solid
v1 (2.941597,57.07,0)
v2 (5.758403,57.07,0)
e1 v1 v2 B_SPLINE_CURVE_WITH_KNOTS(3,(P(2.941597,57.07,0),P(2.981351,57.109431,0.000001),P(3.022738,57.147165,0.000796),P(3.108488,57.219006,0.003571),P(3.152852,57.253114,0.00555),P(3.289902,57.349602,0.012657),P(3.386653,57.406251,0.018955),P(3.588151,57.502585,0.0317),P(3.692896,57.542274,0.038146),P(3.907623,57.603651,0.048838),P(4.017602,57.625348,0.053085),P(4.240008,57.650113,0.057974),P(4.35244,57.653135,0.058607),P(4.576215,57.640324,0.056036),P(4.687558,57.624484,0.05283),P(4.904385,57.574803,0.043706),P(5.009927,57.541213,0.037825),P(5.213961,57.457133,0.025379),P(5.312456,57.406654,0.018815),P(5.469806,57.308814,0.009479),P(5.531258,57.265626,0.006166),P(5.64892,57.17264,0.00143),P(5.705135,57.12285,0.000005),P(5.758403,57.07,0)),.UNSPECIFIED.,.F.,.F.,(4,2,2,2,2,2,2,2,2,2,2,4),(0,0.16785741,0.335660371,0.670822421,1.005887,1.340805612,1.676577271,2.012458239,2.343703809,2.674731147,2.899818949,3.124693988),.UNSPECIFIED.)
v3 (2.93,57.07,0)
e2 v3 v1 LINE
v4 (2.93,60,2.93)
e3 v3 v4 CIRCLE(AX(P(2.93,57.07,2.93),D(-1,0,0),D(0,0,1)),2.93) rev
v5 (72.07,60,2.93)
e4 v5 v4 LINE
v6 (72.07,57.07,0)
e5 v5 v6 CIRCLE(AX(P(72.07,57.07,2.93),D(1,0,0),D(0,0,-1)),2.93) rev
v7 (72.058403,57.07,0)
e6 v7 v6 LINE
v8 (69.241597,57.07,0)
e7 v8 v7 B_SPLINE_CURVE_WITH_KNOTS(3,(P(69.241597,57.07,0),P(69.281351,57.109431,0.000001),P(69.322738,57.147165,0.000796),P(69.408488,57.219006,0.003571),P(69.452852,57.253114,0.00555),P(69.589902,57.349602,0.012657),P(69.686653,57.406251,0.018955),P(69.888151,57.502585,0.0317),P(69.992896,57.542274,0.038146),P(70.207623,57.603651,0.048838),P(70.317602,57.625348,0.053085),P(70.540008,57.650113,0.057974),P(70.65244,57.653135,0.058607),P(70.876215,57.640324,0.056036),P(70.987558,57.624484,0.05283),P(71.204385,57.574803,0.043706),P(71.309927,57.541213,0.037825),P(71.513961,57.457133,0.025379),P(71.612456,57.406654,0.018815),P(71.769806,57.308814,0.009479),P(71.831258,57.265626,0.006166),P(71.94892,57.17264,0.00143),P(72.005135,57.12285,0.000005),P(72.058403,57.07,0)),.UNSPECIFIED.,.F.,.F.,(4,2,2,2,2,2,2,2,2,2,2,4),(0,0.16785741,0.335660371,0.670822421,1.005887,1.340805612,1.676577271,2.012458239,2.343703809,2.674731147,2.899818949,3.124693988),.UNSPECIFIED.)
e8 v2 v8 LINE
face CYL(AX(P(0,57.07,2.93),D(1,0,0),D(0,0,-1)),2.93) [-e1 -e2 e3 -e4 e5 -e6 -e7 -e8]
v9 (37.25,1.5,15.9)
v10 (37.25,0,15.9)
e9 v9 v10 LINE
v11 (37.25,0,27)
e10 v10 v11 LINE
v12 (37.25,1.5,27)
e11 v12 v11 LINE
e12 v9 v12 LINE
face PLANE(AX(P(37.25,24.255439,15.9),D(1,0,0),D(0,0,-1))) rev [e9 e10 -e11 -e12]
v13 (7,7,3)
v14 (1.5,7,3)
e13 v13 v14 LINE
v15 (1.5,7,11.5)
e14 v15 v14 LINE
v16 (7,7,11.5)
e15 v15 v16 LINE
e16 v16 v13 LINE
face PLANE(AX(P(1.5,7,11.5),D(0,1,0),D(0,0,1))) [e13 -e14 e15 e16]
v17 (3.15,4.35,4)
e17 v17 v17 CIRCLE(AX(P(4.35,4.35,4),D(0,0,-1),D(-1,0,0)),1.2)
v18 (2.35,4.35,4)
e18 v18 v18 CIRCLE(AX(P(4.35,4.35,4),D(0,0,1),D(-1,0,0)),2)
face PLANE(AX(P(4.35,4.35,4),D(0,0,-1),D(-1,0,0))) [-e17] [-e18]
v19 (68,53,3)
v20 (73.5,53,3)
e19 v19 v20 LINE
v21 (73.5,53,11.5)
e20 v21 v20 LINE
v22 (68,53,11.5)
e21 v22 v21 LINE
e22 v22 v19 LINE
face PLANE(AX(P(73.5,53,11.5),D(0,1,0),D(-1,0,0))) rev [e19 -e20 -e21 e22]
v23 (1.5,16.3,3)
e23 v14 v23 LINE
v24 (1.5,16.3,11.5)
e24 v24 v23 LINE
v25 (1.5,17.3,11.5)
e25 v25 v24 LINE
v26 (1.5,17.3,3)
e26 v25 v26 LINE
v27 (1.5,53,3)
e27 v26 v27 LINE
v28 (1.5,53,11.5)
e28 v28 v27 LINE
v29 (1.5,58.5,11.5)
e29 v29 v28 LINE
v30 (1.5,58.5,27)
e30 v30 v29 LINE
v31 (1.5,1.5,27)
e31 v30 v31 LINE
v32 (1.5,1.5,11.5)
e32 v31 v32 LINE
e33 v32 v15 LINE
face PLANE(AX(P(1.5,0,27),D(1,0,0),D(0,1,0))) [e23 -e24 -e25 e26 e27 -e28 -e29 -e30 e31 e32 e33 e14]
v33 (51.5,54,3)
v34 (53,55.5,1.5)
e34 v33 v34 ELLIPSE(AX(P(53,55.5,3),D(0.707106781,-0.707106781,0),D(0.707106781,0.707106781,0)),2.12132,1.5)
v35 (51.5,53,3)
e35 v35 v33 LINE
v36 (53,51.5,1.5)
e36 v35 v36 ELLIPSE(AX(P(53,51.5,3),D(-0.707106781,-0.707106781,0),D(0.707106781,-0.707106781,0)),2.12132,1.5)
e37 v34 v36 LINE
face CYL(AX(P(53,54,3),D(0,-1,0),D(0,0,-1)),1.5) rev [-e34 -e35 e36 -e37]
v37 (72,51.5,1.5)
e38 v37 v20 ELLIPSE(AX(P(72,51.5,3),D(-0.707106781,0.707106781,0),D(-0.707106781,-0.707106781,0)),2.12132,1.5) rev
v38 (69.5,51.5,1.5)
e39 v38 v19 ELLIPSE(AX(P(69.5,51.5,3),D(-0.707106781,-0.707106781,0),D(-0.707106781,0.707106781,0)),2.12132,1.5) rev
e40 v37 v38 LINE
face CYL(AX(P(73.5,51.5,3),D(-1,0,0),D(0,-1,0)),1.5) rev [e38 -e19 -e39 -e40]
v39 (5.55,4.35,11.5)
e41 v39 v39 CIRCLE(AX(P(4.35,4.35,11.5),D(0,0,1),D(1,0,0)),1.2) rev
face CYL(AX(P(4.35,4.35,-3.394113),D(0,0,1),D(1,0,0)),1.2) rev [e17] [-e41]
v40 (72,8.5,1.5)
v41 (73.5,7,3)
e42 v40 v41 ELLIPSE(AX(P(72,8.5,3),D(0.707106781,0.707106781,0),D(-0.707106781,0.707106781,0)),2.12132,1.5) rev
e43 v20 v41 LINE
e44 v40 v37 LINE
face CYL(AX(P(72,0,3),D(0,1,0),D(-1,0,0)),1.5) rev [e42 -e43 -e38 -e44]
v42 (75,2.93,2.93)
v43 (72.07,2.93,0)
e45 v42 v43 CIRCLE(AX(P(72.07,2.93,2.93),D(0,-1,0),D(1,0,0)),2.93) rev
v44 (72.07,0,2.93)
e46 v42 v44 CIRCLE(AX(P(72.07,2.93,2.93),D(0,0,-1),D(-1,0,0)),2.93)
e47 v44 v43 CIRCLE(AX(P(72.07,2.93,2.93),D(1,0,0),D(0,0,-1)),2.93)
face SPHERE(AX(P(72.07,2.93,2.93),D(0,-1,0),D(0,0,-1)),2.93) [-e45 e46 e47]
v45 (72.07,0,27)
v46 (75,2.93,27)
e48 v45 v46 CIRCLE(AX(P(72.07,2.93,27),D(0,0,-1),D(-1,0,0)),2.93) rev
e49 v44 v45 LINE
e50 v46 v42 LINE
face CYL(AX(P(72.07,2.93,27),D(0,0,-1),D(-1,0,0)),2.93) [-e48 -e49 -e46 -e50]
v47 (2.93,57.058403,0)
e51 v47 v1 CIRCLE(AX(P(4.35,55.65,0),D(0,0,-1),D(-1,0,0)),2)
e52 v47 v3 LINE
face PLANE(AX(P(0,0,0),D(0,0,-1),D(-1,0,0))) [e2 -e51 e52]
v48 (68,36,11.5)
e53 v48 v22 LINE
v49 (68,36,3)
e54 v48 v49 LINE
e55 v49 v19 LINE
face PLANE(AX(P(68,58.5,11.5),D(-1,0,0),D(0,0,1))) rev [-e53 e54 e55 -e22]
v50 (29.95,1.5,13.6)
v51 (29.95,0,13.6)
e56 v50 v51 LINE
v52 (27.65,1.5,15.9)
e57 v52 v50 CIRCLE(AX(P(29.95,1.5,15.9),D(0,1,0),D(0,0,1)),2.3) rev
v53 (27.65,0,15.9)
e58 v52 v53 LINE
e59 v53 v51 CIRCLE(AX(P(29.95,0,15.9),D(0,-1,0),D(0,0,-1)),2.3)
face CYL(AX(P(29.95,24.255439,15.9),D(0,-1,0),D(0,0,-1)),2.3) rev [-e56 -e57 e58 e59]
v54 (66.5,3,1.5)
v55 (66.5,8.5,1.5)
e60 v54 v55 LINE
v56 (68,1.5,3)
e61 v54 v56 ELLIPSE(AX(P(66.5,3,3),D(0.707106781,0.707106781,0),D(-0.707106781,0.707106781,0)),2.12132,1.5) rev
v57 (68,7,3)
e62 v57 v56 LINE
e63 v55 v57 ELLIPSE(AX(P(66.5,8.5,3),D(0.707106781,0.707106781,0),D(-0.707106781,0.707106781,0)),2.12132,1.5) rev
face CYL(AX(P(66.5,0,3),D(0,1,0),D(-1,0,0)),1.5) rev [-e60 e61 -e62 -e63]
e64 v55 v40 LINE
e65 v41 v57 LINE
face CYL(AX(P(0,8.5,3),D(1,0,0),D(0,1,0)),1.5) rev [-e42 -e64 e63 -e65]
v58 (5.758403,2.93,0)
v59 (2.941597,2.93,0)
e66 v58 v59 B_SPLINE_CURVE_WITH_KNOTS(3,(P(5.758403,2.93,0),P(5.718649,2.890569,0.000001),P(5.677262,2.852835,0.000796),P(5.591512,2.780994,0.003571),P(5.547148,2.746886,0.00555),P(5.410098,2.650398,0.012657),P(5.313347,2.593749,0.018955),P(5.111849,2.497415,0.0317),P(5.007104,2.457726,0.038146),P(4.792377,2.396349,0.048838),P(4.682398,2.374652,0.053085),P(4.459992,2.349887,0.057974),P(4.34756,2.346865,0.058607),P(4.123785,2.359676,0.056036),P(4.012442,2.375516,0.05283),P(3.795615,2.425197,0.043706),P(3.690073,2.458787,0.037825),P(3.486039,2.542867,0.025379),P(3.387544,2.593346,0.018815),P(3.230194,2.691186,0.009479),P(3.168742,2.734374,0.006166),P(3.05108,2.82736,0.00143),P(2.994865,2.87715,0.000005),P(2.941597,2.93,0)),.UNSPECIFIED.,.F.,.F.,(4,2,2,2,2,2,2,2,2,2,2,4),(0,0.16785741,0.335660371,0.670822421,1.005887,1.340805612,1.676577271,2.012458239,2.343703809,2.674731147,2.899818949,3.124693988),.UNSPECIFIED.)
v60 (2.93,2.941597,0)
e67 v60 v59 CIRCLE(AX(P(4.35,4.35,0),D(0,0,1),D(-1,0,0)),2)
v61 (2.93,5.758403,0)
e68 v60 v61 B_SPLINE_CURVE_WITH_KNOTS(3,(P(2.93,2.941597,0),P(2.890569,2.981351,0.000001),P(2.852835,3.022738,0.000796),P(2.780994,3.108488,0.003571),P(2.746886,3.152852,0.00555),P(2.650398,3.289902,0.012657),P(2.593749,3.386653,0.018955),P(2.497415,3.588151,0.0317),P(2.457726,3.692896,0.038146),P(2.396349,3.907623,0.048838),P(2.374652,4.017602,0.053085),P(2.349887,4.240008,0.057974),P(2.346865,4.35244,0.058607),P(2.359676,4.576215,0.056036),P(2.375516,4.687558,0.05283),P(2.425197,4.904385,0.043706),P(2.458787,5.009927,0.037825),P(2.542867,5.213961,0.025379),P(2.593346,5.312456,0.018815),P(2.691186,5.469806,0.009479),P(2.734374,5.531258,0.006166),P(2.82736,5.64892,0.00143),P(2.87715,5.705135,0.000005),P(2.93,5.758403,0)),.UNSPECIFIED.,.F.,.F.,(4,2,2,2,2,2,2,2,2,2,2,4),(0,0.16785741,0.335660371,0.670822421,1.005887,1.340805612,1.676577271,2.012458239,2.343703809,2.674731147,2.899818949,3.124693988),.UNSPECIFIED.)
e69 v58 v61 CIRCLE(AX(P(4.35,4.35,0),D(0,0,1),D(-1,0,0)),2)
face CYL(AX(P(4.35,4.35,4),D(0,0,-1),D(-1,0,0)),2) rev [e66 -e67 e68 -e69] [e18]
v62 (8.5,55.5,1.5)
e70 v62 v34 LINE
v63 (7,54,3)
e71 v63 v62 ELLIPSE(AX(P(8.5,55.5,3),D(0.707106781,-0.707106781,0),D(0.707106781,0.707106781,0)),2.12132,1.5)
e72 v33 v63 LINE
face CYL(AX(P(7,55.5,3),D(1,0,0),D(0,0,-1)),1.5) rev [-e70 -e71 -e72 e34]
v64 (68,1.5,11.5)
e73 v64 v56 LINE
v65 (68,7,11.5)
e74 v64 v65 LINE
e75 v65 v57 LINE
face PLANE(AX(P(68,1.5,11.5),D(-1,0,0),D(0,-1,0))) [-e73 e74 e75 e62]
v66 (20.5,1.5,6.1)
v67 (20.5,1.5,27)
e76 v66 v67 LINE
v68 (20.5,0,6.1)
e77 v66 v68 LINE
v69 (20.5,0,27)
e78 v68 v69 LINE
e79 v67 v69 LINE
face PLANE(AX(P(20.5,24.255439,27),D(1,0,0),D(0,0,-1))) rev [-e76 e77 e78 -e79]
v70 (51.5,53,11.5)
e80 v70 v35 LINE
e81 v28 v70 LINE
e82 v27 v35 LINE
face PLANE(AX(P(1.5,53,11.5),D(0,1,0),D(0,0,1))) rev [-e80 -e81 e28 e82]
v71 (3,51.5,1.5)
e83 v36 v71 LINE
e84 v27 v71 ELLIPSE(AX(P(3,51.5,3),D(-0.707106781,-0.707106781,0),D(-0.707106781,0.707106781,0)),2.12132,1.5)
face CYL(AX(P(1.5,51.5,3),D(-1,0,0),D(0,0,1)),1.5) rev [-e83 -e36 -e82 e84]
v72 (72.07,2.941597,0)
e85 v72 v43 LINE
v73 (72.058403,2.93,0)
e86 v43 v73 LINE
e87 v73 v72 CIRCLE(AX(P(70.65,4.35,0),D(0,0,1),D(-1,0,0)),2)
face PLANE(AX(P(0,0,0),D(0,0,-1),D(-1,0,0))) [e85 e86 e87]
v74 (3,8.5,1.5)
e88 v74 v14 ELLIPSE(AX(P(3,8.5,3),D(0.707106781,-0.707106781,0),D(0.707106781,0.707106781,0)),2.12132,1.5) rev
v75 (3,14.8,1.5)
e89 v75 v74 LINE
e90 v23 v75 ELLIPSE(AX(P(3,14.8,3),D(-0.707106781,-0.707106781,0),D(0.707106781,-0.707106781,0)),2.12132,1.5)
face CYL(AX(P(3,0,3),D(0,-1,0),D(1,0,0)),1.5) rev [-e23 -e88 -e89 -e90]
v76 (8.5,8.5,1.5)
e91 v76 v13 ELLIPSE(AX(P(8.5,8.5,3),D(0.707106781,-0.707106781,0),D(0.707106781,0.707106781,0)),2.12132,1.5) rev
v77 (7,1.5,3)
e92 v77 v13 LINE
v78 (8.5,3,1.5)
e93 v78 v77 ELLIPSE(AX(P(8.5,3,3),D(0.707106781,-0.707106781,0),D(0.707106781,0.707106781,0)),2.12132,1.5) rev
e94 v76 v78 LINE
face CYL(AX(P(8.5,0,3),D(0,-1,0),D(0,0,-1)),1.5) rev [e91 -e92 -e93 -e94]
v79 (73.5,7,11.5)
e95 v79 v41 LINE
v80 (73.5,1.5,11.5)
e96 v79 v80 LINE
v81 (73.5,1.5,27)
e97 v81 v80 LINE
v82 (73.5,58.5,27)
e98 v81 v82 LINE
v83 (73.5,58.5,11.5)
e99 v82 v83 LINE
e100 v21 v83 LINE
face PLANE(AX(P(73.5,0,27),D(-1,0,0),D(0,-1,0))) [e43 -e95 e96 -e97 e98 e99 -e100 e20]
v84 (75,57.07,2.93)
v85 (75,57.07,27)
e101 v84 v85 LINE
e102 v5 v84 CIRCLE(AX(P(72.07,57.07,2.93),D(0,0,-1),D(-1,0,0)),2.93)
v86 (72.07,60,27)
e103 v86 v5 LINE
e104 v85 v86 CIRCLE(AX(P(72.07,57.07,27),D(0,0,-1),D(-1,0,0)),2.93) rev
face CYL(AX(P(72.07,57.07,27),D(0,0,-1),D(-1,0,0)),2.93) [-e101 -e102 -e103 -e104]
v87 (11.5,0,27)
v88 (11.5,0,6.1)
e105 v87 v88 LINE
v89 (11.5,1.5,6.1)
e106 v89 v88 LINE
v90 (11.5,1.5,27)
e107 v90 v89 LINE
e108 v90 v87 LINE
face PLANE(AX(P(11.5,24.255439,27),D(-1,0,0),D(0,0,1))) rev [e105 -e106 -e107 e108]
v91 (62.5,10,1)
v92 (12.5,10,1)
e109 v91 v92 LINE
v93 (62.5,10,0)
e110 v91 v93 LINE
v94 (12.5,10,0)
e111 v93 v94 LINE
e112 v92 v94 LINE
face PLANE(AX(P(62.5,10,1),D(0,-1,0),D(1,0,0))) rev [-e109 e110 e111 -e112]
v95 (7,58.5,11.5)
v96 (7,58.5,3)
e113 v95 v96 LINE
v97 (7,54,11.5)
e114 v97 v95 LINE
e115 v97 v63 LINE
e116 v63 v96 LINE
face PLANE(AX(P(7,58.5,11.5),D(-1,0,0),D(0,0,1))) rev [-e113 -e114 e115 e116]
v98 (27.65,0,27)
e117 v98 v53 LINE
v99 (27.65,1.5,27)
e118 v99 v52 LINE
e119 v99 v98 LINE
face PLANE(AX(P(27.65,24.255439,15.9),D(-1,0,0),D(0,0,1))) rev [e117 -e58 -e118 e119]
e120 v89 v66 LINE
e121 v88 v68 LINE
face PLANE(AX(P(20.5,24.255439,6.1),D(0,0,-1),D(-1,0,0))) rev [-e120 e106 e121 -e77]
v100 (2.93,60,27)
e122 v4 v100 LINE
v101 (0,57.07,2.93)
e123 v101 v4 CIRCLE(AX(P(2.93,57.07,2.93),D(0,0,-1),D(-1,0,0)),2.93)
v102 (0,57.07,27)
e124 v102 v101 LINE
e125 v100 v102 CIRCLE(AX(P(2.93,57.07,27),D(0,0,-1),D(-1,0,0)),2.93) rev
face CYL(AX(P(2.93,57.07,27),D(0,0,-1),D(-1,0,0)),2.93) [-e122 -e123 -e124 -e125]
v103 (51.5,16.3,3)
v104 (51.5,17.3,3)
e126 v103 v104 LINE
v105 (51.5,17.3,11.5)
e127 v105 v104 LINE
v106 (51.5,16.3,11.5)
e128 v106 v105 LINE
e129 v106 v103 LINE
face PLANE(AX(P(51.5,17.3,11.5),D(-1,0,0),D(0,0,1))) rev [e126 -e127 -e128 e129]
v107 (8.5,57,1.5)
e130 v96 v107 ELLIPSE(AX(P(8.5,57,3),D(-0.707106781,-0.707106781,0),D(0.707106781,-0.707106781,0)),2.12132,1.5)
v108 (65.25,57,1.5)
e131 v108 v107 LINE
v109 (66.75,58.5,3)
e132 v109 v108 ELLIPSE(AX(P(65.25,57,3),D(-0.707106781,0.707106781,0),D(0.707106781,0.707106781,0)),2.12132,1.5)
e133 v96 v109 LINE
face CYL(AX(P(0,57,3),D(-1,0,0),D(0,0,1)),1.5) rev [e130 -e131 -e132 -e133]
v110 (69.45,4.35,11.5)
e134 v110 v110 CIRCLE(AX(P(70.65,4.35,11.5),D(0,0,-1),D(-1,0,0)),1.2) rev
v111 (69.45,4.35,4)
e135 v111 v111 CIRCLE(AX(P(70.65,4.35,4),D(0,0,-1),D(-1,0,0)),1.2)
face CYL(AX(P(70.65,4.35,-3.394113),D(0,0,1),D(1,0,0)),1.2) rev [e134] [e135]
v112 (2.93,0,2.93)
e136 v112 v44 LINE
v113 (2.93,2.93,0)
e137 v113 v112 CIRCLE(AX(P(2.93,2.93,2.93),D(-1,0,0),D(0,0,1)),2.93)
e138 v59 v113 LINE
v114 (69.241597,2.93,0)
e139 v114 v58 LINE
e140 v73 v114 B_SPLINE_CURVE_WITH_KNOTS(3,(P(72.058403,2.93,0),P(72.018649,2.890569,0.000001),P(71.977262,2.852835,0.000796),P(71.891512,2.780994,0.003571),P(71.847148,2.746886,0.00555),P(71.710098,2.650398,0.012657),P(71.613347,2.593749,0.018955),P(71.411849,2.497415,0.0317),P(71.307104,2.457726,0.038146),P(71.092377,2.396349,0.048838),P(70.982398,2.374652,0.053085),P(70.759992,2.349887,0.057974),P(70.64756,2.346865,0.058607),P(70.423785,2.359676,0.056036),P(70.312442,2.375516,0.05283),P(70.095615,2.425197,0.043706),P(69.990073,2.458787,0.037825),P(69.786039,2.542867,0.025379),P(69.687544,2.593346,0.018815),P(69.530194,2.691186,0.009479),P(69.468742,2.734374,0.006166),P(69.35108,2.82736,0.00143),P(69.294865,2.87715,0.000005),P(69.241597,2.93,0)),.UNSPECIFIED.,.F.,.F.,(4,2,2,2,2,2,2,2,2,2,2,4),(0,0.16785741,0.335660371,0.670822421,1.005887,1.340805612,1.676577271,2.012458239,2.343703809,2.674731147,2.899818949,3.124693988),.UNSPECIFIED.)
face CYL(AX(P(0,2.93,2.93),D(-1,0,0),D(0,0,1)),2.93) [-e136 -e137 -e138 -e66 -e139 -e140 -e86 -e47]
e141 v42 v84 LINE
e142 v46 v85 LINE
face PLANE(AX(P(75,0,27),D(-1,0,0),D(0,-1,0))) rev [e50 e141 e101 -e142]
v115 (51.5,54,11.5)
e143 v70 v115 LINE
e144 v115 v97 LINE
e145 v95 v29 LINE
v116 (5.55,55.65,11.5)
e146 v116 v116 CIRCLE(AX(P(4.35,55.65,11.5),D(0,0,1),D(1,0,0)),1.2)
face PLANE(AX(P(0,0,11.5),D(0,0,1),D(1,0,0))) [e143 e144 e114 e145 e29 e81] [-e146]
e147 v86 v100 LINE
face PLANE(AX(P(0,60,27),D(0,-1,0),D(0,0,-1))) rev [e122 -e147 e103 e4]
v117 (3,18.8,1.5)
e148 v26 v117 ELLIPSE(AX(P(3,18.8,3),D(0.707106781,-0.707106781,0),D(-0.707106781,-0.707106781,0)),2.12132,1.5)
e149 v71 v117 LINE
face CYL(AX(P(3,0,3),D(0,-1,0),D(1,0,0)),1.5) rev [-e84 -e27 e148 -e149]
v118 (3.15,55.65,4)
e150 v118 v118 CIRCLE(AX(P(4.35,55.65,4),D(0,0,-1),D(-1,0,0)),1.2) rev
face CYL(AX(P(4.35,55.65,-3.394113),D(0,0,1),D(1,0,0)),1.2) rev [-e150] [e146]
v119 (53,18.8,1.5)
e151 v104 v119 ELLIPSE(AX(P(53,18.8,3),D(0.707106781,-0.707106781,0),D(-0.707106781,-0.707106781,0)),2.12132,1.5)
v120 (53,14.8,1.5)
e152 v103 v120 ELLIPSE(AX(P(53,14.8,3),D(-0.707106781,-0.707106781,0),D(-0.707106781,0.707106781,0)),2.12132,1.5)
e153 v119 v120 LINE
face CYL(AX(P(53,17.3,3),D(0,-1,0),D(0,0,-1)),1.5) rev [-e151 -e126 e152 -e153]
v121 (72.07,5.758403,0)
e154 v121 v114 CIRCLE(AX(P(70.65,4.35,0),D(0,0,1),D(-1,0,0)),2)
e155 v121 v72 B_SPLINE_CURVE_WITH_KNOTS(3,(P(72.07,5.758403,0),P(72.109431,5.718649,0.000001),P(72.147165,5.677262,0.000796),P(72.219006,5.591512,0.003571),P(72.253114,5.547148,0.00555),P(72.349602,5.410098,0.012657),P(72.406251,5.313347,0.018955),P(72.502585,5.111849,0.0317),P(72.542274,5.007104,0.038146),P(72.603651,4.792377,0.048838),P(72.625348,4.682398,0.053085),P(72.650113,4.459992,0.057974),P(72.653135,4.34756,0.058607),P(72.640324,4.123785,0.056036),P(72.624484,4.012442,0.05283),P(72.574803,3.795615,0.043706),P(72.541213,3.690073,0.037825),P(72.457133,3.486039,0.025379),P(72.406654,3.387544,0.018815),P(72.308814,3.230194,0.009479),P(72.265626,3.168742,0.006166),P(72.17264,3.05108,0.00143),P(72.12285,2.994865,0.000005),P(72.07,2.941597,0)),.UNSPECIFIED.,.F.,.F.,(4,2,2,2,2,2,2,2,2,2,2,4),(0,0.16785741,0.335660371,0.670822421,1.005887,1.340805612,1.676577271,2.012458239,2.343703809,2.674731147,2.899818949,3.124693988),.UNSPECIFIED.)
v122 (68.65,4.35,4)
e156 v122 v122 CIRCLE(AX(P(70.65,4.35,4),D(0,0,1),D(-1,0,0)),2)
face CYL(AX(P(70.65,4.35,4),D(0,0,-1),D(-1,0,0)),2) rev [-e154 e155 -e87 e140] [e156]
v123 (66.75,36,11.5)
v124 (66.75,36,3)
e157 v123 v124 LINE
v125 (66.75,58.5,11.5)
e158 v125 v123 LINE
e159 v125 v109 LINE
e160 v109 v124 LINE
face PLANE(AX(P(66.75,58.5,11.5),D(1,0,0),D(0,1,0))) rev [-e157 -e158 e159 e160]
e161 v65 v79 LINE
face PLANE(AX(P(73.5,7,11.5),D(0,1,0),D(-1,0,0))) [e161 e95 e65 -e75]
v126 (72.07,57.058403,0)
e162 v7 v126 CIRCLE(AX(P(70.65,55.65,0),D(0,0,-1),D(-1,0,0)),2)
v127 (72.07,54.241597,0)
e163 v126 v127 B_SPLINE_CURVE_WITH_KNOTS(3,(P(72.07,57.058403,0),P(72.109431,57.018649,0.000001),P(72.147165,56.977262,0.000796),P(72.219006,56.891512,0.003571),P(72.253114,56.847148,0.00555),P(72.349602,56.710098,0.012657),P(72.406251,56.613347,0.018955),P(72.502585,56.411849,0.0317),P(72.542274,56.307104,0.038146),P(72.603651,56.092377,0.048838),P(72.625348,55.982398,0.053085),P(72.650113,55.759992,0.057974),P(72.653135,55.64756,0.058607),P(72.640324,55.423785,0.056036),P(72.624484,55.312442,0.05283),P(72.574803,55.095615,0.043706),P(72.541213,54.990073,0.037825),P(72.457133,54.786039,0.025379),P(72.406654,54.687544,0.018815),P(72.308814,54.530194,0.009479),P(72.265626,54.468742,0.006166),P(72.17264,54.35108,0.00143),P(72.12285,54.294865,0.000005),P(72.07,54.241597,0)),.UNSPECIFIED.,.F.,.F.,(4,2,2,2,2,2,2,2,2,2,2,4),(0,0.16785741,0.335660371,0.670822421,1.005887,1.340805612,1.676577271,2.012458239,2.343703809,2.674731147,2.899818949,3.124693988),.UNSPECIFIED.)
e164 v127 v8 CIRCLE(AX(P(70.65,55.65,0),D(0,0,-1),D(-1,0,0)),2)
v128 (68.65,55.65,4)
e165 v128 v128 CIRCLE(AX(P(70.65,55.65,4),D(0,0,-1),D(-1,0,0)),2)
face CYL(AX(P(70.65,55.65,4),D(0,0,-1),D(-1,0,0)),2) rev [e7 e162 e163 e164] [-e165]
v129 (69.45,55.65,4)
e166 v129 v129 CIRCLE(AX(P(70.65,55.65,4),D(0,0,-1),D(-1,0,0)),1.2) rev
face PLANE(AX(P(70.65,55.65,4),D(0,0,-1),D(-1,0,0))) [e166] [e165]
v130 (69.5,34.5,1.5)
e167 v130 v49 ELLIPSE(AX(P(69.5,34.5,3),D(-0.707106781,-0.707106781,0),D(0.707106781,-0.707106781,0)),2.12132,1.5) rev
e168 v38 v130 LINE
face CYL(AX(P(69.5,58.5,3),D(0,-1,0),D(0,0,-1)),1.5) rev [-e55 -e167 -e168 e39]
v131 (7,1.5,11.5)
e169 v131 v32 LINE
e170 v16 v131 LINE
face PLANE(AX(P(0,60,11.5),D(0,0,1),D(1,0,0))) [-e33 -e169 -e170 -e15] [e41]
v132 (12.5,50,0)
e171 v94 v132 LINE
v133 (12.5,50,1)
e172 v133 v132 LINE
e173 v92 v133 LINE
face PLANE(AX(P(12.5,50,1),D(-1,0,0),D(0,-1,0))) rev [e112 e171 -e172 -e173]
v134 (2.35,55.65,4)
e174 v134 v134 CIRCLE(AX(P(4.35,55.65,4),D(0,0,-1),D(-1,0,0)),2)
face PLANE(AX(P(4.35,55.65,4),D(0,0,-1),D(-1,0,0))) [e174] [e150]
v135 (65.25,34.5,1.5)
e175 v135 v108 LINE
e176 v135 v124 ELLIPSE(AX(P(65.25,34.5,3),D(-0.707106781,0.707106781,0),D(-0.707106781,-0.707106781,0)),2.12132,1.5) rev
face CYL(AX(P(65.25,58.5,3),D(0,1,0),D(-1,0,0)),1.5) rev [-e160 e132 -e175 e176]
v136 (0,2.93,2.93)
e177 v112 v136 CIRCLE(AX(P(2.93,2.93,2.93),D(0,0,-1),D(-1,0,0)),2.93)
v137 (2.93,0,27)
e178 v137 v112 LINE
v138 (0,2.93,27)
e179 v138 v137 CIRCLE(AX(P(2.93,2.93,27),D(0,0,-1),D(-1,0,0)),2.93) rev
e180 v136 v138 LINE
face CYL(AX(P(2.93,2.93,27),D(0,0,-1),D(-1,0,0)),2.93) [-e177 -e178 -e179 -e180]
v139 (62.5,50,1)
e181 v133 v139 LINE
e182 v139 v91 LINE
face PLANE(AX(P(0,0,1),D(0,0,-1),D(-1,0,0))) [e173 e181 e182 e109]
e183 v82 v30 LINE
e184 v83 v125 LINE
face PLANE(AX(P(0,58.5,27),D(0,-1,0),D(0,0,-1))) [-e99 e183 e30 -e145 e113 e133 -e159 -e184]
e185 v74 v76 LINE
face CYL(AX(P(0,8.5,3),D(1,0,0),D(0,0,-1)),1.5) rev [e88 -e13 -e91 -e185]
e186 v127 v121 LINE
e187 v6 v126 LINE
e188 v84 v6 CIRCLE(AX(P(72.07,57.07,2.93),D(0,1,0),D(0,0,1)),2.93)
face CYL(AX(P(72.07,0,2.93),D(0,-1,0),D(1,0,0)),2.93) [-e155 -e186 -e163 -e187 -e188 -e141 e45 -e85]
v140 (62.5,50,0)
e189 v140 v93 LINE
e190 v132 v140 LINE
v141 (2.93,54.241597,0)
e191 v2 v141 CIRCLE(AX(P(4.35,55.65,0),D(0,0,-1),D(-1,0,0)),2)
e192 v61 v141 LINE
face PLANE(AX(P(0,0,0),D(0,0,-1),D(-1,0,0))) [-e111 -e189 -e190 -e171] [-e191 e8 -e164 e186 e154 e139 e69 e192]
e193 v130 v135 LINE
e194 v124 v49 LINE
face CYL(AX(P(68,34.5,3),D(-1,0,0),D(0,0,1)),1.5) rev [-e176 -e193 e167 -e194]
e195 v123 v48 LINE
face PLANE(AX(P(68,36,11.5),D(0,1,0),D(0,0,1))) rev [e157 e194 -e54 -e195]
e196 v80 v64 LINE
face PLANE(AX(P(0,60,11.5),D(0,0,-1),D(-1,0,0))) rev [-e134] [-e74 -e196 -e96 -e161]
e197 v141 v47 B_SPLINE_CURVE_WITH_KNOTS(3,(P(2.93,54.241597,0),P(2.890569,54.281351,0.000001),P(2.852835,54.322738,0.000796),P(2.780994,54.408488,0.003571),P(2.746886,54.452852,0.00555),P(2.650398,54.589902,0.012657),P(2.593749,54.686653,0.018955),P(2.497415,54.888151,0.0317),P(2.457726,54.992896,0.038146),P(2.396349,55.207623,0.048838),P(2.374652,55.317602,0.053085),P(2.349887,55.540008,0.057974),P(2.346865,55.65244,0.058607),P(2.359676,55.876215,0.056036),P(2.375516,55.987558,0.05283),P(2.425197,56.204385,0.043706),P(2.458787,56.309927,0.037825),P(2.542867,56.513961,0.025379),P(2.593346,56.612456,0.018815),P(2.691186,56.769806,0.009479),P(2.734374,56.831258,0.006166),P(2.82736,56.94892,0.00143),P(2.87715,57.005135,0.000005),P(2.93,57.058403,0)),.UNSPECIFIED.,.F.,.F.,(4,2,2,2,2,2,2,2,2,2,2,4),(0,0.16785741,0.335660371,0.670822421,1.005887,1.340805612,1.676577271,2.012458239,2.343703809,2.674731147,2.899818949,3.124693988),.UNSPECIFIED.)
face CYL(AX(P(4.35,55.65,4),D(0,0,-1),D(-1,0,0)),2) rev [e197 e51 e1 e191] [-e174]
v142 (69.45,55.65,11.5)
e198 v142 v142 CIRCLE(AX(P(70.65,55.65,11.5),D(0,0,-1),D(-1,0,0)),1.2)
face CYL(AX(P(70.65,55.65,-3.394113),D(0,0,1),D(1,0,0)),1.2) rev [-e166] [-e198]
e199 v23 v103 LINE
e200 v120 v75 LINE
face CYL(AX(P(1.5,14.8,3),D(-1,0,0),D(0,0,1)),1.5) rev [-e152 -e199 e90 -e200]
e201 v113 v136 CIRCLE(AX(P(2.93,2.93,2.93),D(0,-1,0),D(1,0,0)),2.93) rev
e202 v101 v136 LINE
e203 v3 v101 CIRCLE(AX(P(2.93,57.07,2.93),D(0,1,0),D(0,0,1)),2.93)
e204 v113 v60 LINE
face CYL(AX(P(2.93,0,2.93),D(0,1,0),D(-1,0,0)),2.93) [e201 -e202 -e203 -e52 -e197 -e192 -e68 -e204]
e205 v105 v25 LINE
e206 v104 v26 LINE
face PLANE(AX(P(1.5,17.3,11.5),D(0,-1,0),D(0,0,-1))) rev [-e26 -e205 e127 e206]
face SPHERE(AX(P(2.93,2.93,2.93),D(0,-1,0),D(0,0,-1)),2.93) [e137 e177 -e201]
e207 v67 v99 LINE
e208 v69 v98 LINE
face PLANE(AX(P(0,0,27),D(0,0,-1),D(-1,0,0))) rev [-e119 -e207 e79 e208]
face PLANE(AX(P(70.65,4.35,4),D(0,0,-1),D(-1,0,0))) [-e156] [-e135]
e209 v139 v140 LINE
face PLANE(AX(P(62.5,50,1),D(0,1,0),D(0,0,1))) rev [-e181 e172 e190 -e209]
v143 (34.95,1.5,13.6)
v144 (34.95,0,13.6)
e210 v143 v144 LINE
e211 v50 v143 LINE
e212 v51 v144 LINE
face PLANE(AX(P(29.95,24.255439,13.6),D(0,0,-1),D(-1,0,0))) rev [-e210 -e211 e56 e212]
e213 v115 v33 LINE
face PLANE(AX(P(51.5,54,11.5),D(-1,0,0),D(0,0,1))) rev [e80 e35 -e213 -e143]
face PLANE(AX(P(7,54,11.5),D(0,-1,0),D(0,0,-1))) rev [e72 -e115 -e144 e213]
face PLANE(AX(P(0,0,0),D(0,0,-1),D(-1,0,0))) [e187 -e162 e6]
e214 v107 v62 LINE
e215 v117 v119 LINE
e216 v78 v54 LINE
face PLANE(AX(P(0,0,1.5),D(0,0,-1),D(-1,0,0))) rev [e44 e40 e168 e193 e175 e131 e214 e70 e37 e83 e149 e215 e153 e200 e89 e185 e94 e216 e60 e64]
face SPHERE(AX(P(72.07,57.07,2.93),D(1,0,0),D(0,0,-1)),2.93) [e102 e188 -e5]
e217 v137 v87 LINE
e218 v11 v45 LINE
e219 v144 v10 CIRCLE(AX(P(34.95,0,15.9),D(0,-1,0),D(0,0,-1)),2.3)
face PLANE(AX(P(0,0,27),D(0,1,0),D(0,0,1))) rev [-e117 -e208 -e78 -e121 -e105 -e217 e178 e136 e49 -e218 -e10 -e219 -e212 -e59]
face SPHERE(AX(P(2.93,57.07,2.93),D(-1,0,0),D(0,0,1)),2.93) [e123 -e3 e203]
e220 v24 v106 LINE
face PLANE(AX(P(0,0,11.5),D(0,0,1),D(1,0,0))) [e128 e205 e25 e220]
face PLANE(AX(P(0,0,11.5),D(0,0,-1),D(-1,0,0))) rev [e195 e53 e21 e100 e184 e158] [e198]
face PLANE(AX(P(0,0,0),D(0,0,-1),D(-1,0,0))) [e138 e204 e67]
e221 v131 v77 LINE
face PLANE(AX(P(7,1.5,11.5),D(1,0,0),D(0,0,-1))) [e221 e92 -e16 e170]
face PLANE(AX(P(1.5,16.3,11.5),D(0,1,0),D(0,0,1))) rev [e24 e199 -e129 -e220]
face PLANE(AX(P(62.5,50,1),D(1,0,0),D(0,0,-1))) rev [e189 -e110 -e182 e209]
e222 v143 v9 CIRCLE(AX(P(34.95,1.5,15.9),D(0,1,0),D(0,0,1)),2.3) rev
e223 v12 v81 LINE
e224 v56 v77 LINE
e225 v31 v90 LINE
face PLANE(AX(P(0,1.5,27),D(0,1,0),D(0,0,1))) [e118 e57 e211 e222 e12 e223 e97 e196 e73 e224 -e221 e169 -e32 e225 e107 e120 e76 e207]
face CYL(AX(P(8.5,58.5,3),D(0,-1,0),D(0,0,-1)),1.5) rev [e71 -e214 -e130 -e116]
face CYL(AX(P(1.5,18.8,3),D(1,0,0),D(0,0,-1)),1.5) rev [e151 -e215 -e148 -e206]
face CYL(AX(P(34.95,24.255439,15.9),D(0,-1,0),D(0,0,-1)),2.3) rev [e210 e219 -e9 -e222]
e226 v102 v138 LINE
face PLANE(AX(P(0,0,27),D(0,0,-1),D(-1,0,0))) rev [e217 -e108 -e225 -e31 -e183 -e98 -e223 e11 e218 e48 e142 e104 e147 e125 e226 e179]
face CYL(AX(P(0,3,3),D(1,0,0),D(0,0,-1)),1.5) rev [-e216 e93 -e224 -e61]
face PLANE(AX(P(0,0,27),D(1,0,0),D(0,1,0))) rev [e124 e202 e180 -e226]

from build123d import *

# Parameters (mm, degrees)
SKETCH2_W               = 75
SKETCH2_H               = 60
BODY_CREATION_DEPTH     = 27
THIKNESS_OF_WALLS_T     = -1.5
SKETCH6_W               = 5.5
SKETCH6_H               = 5.5
CORNER_RECT_DEPTH       = 10
SKETCH8_R               = 1.2
SCREW_HOLE_DEPTH        = 27
SKETCH10_R              = 2
SCREW_HEAD_DEPTH        = 4
SKETCH5_W               = 9
SKETCH5_H               = 20.9
PORTS_CUT_OUT_DEPTH     = 1.5
SKETCH11_W              = 44.5
SKETCH11_H              = 1
SKETCH11_W_2            = 50
SKETCH11_W_3            = 1.25
SKETCH11_H_2            = 22.5
BATTERY_PLACEMENT_DEPTH = 10
FILLET1_R               = 1.5
FILLET2_R               = 2.93
SKETCH13_W              = 50
SKETCH13_H              = 40
CUT_EXTRUDE1_DEPTH      = 1


with BuildPart() as part:
    # Sketch2 → Body creation (new body)
    with BuildSketch(Plane.XY):
        with Locations((37.5, 30)):
            Rectangle(SKETCH2_W, SKETCH2_H)
    extrude(amount=BODY_CREATION_DEPTH)

    # Thikness of walls
    thikness_of_walls_openings = [part.faces().sort_by_distance(p)[0] for p in [
        (37.5, 30, 27),
    ]]
    offset(amount=THIKNESS_OF_WALLS_T, openings=thikness_of_walls_openings, kind=Kind.INTERSECTION)

    # Sketch6 → Corner rect. (add)
    with BuildSketch(Plane.XY.offset(1.5)):
        with Locations((4.25, 55.75)):
            Rectangle(SKETCH6_W, SKETCH6_H)
        with Locations((70.75, 55.75)):
            Rectangle(SKETCH6_W, SKETCH6_H)
    corner_rect = extrude(amount=CORNER_RECT_DEPTH)

    # Sketch8 → Screw hole (cut)
    with BuildSketch(Plane.XY.offset(27)):
        with Locations((4.35, 55.65)):
            Circle(SKETCH8_R)
        with Locations(Location((70.65, 55.65, 0), (0, 0, 180))):
            Circle(SKETCH8_R)
    screw_hole = extrude(amount=-SCREW_HOLE_DEPTH, mode=Mode.SUBTRACT)

    # Sketch10 → Screw head (cut)
    with BuildSketch(Plane(origin=(0, 0, 0), x_dir=(-1, 0, 0), z_dir=(0, 0, -1))):
        with Locations((-70.65, 55.65)):
            Circle(SKETCH10_R)
        with Locations((-4.35, 55.65)):
            Circle(SKETCH10_R)
    screw_head = extrude(amount=-SCREW_HEAD_DEPTH, mode=Mode.SUBTRACT)

    # Mirror to other side: Corner rect., Screw hole, Screw head across plane
    add(corner_rect.mirror(Plane(origin=(0, 30, 0), x_dir=(0, 0, 1), z_dir=(0, -1, 0))))
    add(screw_hole.mirror(Plane(origin=(0, 30, 0), x_dir=(0, 0, 1), z_dir=(0, -1, 0))), mode=Mode.SUBTRACT)
    add(screw_head.mirror(Plane(origin=(0, 30, 0), x_dir=(0, 0, 1), z_dir=(0, -1, 0))), mode=Mode.SUBTRACT)

    # Sketch5 → Ports cut out (cut)
    with BuildSketch(Plane.XZ):
        with Locations((16, 16.55)):
            Rectangle(SKETCH5_W, SKETCH5_H)
        with BuildLine():
            Line((29.95, 13.6), (34.95, 13.6))
            ThreePointArc((34.95, 13.6), (36.576345597, 14.273654403), (37.25, 15.9))
            Line((37.25, 15.9), (37.25, 27))
            Line((37.25, 27), (27.65, 27))
            Line((27.65, 27), (27.65, 15.9))
            ThreePointArc((27.65, 15.9), (28.323654403, 14.273654403), (29.95, 13.6))
        make_face()
    extrude(amount=-PORTS_CUT_OUT_DEPTH, mode=Mode.SUBTRACT)

    # Sketch11 → Battery Placement (add)
    with BuildSketch(Plane.XY.offset(1.5)):
        with Locations((29.25, 53.5)):
            Rectangle(SKETCH11_W, SKETCH11_H)
        with Locations((26.5, 16.8)):
            Rectangle(SKETCH11_W_2, SKETCH11_H)
        with Locations((67.375, 47.25)):
            Rectangle(SKETCH11_W_3, SKETCH11_H_2)
    extrude(amount=BATTERY_PLACEMENT_DEPTH)

    # Fillet1
    fillet1_edges = [part.edges().sort_by_distance(p)[0] for p in [
        (7, 56.25, 1.5),
        (51.5, 53.5, 1.5),
        (29.25, 54, 1.5),
        (1.5, 11.65, 1.5),
        (51.5, 16.8, 1.5),
        (26.5, 17.3, 1.5),
        (26.5, 16.3, 1.5),
        (36.875, 58.5, 1.5),
        (68, 44.5, 1.5),
        (66.75, 47.25, 1.5),
        (67.375, 36, 1.5),
        (1.5, 35.15, 1.5),
        (26.5, 53, 1.5),
        (70.75, 53, 1.5),
        (37.5, 1.5, 1.5),
        (4.25, 7, 1.5),
        (7, 4.25, 1.5),
        (73.5, 30, 1.5),
        (68, 4.25, 1.5),
        (70.75, 7, 1.5),
    ]]
    fillet(fillet1_edges, radius=FILLET1_R)

    # Fillet2
    # the kernel refuses this fillet: 2.93 mm, written as the material it takes off along each edge
    with BuildSketch(Plane(origin=(72.07, 57.07, 2.93), x_dir=(1, 0, 0), z_dir=(0, 1, 0))) as fillet2_piece_1_section:
        Polygon((0, 0), (FILLET2_R, 0), (FILLET2_R, FILLET2_R), (0, FILLET2_R), align=None)
    fillet2_piece_1 = extrude(amount=FILLET2_R, mode=Mode.PRIVATE)
    fillet2_piece_1 = fillet2_piece_1 - Plane(origin=(72.07, 57.07, 2.93), x_dir=(-0.7071067811865475, 0, 0.7071067811865475), z_dir=(0, 1, 0)) * Sphere(FILLET2_R, mode=Mode.PRIVATE)
    add(fillet2_piece_1, mode=Mode.SUBTRACT)
    with BuildSketch(Plane(origin=(2.93, 57.07, 2.93), x_dir=(0, 1, 0), z_dir=(-1, 0, 0))) as fillet2_piece_2_section:
        Polygon((0, 0), (FILLET2_R, 0), (FILLET2_R, FILLET2_R), (0, FILLET2_R), align=None)
    fillet2_piece_2 = extrude(amount=FILLET2_R, mode=Mode.PRIVATE)
    fillet2_piece_2 = fillet2_piece_2 - Plane(origin=(2.93, 57.07, 2.93), x_dir=(0, -0.7071067811865475, 0.7071067811865475), z_dir=(-1, 0, 0)) * Sphere(FILLET2_R, mode=Mode.PRIVATE)
    add(fillet2_piece_2, mode=Mode.SUBTRACT)
    with BuildSketch(Plane(origin=(72.07, 2.93, 2.93), x_dir=(0, -1, 0), z_dir=(1, 0, 0))) as fillet2_piece_3_section:
        Polygon((0, 0), (FILLET2_R, 0), (FILLET2_R, FILLET2_R), (0, FILLET2_R), align=None)
    fillet2_piece_3 = extrude(amount=FILLET2_R, mode=Mode.PRIVATE)
    fillet2_piece_3 = fillet2_piece_3 - Plane(origin=(72.07, 2.93, 2.93), x_dir=(0, 0.7071067811865475, 0.7071067811865475), z_dir=(1, 0, 0)) * Sphere(FILLET2_R, mode=Mode.PRIVATE)
    add(fillet2_piece_3, mode=Mode.SUBTRACT)
    with BuildSketch(Plane(origin=(2.93, 2.93, 2.93), x_dir=(0, -1, 0), z_dir=(-1, 0, 0))) as fillet2_piece_4_section:
        Polygon((0, 0), (FILLET2_R, 0), (FILLET2_R, -FILLET2_R), (0, -FILLET2_R), align=None)
    fillet2_piece_4 = extrude(amount=FILLET2_R, mode=Mode.PRIVATE)
    fillet2_piece_4 = fillet2_piece_4 - Plane(origin=(2.93, 2.93, 2.93), x_dir=(0, 0.7071067811865475, 0.7071067811865475), z_dir=(-1, 0, 0)) * Sphere(FILLET2_R, mode=Mode.PRIVATE)
    add(fillet2_piece_4, mode=Mode.SUBTRACT)
    with BuildSketch(Plane(origin=(72.07, 60, 0), x_dir=(0, 0, 1), z_dir=(-1, 0, 0)), Plane(origin=(2.93, 0, 0), x_dir=(0, 0, 1), z_dir=(1, 0, 0))) as fillet2_piece_5:
        with BuildLine():
            CenterArc((FILLET2_R, -FILLET2_R), FILLET2_R, 90, 90)
            Line((0, -FILLET2_R), (0, 0))
            Line((0, 0), (FILLET2_R, 0))
        make_face()
    extrude(amount=69.14, mode=Mode.SUBTRACT)
    with BuildSketch(Plane(origin=(75, 2.93, 0), x_dir=(0, 0, 1), z_dir=(0, 1, 0)), Plane(origin=(0, 57.07, 0), x_dir=(0, 0, 1), z_dir=(0, -1, 0))) as fillet2_piece_6:
        with BuildLine():
            CenterArc((FILLET2_R, -FILLET2_R), FILLET2_R, 90, 90)
            Line((0, -FILLET2_R), (0, 0))
            Line((0, 0), (FILLET2_R, 0))
        make_face()
    extrude(amount=54.14, mode=Mode.SUBTRACT)
    with BuildSketch(Plane(origin=(0, 60, 2.93), x_dir=(0, -1, 0), z_dir=(0, 0, 1)), Plane(origin=(75, 60, 2.93), x_dir=(-1, 0, 0), z_dir=(0, 0, 1)), Plane(origin=(75, 0, 2.93), x_dir=(0, 1, 0), z_dir=(0, 0, 1))) as fillet2_piece_7:
        with BuildLine():
            CenterArc((FILLET2_R, FILLET2_R), FILLET2_R, 180, 90)
            Line((0, FILLET2_R), (0, 0))
            Line((0, 0), (FILLET2_R, 0))
        make_face()
    extrude(amount=31.395, mode=Mode.SUBTRACT)
    with BuildSketch(Plane(origin=(0, 0, 2.93), x_dir=(0, 1, 0), z_dir=(0, 0, 1))) as fillet2_piece_8:
        with BuildLine():
            CenterArc((FILLET2_R, -FILLET2_R), FILLET2_R, 90, 90)
            Line((0, -FILLET2_R), (0, 0))
            Line((0, 0), (FILLET2_R, 0))
        make_face()
    extrude(amount=31.395, mode=Mode.SUBTRACT)

    # Sketch13 → Cut-Extrude1 (cut)
    with BuildSketch(Plane(origin=(0, 0, 0), x_dir=(-1, 0, 0), z_dir=(0, 0, -1))):
        with Locations((-37.5, 30)):
            Rectangle(SKETCH13_W, SKETCH13_H)
    extrude(amount=-CUT_EXTRUDE1_DEPTH, mode=Mode.SUBTRACT)


solid = part.part
